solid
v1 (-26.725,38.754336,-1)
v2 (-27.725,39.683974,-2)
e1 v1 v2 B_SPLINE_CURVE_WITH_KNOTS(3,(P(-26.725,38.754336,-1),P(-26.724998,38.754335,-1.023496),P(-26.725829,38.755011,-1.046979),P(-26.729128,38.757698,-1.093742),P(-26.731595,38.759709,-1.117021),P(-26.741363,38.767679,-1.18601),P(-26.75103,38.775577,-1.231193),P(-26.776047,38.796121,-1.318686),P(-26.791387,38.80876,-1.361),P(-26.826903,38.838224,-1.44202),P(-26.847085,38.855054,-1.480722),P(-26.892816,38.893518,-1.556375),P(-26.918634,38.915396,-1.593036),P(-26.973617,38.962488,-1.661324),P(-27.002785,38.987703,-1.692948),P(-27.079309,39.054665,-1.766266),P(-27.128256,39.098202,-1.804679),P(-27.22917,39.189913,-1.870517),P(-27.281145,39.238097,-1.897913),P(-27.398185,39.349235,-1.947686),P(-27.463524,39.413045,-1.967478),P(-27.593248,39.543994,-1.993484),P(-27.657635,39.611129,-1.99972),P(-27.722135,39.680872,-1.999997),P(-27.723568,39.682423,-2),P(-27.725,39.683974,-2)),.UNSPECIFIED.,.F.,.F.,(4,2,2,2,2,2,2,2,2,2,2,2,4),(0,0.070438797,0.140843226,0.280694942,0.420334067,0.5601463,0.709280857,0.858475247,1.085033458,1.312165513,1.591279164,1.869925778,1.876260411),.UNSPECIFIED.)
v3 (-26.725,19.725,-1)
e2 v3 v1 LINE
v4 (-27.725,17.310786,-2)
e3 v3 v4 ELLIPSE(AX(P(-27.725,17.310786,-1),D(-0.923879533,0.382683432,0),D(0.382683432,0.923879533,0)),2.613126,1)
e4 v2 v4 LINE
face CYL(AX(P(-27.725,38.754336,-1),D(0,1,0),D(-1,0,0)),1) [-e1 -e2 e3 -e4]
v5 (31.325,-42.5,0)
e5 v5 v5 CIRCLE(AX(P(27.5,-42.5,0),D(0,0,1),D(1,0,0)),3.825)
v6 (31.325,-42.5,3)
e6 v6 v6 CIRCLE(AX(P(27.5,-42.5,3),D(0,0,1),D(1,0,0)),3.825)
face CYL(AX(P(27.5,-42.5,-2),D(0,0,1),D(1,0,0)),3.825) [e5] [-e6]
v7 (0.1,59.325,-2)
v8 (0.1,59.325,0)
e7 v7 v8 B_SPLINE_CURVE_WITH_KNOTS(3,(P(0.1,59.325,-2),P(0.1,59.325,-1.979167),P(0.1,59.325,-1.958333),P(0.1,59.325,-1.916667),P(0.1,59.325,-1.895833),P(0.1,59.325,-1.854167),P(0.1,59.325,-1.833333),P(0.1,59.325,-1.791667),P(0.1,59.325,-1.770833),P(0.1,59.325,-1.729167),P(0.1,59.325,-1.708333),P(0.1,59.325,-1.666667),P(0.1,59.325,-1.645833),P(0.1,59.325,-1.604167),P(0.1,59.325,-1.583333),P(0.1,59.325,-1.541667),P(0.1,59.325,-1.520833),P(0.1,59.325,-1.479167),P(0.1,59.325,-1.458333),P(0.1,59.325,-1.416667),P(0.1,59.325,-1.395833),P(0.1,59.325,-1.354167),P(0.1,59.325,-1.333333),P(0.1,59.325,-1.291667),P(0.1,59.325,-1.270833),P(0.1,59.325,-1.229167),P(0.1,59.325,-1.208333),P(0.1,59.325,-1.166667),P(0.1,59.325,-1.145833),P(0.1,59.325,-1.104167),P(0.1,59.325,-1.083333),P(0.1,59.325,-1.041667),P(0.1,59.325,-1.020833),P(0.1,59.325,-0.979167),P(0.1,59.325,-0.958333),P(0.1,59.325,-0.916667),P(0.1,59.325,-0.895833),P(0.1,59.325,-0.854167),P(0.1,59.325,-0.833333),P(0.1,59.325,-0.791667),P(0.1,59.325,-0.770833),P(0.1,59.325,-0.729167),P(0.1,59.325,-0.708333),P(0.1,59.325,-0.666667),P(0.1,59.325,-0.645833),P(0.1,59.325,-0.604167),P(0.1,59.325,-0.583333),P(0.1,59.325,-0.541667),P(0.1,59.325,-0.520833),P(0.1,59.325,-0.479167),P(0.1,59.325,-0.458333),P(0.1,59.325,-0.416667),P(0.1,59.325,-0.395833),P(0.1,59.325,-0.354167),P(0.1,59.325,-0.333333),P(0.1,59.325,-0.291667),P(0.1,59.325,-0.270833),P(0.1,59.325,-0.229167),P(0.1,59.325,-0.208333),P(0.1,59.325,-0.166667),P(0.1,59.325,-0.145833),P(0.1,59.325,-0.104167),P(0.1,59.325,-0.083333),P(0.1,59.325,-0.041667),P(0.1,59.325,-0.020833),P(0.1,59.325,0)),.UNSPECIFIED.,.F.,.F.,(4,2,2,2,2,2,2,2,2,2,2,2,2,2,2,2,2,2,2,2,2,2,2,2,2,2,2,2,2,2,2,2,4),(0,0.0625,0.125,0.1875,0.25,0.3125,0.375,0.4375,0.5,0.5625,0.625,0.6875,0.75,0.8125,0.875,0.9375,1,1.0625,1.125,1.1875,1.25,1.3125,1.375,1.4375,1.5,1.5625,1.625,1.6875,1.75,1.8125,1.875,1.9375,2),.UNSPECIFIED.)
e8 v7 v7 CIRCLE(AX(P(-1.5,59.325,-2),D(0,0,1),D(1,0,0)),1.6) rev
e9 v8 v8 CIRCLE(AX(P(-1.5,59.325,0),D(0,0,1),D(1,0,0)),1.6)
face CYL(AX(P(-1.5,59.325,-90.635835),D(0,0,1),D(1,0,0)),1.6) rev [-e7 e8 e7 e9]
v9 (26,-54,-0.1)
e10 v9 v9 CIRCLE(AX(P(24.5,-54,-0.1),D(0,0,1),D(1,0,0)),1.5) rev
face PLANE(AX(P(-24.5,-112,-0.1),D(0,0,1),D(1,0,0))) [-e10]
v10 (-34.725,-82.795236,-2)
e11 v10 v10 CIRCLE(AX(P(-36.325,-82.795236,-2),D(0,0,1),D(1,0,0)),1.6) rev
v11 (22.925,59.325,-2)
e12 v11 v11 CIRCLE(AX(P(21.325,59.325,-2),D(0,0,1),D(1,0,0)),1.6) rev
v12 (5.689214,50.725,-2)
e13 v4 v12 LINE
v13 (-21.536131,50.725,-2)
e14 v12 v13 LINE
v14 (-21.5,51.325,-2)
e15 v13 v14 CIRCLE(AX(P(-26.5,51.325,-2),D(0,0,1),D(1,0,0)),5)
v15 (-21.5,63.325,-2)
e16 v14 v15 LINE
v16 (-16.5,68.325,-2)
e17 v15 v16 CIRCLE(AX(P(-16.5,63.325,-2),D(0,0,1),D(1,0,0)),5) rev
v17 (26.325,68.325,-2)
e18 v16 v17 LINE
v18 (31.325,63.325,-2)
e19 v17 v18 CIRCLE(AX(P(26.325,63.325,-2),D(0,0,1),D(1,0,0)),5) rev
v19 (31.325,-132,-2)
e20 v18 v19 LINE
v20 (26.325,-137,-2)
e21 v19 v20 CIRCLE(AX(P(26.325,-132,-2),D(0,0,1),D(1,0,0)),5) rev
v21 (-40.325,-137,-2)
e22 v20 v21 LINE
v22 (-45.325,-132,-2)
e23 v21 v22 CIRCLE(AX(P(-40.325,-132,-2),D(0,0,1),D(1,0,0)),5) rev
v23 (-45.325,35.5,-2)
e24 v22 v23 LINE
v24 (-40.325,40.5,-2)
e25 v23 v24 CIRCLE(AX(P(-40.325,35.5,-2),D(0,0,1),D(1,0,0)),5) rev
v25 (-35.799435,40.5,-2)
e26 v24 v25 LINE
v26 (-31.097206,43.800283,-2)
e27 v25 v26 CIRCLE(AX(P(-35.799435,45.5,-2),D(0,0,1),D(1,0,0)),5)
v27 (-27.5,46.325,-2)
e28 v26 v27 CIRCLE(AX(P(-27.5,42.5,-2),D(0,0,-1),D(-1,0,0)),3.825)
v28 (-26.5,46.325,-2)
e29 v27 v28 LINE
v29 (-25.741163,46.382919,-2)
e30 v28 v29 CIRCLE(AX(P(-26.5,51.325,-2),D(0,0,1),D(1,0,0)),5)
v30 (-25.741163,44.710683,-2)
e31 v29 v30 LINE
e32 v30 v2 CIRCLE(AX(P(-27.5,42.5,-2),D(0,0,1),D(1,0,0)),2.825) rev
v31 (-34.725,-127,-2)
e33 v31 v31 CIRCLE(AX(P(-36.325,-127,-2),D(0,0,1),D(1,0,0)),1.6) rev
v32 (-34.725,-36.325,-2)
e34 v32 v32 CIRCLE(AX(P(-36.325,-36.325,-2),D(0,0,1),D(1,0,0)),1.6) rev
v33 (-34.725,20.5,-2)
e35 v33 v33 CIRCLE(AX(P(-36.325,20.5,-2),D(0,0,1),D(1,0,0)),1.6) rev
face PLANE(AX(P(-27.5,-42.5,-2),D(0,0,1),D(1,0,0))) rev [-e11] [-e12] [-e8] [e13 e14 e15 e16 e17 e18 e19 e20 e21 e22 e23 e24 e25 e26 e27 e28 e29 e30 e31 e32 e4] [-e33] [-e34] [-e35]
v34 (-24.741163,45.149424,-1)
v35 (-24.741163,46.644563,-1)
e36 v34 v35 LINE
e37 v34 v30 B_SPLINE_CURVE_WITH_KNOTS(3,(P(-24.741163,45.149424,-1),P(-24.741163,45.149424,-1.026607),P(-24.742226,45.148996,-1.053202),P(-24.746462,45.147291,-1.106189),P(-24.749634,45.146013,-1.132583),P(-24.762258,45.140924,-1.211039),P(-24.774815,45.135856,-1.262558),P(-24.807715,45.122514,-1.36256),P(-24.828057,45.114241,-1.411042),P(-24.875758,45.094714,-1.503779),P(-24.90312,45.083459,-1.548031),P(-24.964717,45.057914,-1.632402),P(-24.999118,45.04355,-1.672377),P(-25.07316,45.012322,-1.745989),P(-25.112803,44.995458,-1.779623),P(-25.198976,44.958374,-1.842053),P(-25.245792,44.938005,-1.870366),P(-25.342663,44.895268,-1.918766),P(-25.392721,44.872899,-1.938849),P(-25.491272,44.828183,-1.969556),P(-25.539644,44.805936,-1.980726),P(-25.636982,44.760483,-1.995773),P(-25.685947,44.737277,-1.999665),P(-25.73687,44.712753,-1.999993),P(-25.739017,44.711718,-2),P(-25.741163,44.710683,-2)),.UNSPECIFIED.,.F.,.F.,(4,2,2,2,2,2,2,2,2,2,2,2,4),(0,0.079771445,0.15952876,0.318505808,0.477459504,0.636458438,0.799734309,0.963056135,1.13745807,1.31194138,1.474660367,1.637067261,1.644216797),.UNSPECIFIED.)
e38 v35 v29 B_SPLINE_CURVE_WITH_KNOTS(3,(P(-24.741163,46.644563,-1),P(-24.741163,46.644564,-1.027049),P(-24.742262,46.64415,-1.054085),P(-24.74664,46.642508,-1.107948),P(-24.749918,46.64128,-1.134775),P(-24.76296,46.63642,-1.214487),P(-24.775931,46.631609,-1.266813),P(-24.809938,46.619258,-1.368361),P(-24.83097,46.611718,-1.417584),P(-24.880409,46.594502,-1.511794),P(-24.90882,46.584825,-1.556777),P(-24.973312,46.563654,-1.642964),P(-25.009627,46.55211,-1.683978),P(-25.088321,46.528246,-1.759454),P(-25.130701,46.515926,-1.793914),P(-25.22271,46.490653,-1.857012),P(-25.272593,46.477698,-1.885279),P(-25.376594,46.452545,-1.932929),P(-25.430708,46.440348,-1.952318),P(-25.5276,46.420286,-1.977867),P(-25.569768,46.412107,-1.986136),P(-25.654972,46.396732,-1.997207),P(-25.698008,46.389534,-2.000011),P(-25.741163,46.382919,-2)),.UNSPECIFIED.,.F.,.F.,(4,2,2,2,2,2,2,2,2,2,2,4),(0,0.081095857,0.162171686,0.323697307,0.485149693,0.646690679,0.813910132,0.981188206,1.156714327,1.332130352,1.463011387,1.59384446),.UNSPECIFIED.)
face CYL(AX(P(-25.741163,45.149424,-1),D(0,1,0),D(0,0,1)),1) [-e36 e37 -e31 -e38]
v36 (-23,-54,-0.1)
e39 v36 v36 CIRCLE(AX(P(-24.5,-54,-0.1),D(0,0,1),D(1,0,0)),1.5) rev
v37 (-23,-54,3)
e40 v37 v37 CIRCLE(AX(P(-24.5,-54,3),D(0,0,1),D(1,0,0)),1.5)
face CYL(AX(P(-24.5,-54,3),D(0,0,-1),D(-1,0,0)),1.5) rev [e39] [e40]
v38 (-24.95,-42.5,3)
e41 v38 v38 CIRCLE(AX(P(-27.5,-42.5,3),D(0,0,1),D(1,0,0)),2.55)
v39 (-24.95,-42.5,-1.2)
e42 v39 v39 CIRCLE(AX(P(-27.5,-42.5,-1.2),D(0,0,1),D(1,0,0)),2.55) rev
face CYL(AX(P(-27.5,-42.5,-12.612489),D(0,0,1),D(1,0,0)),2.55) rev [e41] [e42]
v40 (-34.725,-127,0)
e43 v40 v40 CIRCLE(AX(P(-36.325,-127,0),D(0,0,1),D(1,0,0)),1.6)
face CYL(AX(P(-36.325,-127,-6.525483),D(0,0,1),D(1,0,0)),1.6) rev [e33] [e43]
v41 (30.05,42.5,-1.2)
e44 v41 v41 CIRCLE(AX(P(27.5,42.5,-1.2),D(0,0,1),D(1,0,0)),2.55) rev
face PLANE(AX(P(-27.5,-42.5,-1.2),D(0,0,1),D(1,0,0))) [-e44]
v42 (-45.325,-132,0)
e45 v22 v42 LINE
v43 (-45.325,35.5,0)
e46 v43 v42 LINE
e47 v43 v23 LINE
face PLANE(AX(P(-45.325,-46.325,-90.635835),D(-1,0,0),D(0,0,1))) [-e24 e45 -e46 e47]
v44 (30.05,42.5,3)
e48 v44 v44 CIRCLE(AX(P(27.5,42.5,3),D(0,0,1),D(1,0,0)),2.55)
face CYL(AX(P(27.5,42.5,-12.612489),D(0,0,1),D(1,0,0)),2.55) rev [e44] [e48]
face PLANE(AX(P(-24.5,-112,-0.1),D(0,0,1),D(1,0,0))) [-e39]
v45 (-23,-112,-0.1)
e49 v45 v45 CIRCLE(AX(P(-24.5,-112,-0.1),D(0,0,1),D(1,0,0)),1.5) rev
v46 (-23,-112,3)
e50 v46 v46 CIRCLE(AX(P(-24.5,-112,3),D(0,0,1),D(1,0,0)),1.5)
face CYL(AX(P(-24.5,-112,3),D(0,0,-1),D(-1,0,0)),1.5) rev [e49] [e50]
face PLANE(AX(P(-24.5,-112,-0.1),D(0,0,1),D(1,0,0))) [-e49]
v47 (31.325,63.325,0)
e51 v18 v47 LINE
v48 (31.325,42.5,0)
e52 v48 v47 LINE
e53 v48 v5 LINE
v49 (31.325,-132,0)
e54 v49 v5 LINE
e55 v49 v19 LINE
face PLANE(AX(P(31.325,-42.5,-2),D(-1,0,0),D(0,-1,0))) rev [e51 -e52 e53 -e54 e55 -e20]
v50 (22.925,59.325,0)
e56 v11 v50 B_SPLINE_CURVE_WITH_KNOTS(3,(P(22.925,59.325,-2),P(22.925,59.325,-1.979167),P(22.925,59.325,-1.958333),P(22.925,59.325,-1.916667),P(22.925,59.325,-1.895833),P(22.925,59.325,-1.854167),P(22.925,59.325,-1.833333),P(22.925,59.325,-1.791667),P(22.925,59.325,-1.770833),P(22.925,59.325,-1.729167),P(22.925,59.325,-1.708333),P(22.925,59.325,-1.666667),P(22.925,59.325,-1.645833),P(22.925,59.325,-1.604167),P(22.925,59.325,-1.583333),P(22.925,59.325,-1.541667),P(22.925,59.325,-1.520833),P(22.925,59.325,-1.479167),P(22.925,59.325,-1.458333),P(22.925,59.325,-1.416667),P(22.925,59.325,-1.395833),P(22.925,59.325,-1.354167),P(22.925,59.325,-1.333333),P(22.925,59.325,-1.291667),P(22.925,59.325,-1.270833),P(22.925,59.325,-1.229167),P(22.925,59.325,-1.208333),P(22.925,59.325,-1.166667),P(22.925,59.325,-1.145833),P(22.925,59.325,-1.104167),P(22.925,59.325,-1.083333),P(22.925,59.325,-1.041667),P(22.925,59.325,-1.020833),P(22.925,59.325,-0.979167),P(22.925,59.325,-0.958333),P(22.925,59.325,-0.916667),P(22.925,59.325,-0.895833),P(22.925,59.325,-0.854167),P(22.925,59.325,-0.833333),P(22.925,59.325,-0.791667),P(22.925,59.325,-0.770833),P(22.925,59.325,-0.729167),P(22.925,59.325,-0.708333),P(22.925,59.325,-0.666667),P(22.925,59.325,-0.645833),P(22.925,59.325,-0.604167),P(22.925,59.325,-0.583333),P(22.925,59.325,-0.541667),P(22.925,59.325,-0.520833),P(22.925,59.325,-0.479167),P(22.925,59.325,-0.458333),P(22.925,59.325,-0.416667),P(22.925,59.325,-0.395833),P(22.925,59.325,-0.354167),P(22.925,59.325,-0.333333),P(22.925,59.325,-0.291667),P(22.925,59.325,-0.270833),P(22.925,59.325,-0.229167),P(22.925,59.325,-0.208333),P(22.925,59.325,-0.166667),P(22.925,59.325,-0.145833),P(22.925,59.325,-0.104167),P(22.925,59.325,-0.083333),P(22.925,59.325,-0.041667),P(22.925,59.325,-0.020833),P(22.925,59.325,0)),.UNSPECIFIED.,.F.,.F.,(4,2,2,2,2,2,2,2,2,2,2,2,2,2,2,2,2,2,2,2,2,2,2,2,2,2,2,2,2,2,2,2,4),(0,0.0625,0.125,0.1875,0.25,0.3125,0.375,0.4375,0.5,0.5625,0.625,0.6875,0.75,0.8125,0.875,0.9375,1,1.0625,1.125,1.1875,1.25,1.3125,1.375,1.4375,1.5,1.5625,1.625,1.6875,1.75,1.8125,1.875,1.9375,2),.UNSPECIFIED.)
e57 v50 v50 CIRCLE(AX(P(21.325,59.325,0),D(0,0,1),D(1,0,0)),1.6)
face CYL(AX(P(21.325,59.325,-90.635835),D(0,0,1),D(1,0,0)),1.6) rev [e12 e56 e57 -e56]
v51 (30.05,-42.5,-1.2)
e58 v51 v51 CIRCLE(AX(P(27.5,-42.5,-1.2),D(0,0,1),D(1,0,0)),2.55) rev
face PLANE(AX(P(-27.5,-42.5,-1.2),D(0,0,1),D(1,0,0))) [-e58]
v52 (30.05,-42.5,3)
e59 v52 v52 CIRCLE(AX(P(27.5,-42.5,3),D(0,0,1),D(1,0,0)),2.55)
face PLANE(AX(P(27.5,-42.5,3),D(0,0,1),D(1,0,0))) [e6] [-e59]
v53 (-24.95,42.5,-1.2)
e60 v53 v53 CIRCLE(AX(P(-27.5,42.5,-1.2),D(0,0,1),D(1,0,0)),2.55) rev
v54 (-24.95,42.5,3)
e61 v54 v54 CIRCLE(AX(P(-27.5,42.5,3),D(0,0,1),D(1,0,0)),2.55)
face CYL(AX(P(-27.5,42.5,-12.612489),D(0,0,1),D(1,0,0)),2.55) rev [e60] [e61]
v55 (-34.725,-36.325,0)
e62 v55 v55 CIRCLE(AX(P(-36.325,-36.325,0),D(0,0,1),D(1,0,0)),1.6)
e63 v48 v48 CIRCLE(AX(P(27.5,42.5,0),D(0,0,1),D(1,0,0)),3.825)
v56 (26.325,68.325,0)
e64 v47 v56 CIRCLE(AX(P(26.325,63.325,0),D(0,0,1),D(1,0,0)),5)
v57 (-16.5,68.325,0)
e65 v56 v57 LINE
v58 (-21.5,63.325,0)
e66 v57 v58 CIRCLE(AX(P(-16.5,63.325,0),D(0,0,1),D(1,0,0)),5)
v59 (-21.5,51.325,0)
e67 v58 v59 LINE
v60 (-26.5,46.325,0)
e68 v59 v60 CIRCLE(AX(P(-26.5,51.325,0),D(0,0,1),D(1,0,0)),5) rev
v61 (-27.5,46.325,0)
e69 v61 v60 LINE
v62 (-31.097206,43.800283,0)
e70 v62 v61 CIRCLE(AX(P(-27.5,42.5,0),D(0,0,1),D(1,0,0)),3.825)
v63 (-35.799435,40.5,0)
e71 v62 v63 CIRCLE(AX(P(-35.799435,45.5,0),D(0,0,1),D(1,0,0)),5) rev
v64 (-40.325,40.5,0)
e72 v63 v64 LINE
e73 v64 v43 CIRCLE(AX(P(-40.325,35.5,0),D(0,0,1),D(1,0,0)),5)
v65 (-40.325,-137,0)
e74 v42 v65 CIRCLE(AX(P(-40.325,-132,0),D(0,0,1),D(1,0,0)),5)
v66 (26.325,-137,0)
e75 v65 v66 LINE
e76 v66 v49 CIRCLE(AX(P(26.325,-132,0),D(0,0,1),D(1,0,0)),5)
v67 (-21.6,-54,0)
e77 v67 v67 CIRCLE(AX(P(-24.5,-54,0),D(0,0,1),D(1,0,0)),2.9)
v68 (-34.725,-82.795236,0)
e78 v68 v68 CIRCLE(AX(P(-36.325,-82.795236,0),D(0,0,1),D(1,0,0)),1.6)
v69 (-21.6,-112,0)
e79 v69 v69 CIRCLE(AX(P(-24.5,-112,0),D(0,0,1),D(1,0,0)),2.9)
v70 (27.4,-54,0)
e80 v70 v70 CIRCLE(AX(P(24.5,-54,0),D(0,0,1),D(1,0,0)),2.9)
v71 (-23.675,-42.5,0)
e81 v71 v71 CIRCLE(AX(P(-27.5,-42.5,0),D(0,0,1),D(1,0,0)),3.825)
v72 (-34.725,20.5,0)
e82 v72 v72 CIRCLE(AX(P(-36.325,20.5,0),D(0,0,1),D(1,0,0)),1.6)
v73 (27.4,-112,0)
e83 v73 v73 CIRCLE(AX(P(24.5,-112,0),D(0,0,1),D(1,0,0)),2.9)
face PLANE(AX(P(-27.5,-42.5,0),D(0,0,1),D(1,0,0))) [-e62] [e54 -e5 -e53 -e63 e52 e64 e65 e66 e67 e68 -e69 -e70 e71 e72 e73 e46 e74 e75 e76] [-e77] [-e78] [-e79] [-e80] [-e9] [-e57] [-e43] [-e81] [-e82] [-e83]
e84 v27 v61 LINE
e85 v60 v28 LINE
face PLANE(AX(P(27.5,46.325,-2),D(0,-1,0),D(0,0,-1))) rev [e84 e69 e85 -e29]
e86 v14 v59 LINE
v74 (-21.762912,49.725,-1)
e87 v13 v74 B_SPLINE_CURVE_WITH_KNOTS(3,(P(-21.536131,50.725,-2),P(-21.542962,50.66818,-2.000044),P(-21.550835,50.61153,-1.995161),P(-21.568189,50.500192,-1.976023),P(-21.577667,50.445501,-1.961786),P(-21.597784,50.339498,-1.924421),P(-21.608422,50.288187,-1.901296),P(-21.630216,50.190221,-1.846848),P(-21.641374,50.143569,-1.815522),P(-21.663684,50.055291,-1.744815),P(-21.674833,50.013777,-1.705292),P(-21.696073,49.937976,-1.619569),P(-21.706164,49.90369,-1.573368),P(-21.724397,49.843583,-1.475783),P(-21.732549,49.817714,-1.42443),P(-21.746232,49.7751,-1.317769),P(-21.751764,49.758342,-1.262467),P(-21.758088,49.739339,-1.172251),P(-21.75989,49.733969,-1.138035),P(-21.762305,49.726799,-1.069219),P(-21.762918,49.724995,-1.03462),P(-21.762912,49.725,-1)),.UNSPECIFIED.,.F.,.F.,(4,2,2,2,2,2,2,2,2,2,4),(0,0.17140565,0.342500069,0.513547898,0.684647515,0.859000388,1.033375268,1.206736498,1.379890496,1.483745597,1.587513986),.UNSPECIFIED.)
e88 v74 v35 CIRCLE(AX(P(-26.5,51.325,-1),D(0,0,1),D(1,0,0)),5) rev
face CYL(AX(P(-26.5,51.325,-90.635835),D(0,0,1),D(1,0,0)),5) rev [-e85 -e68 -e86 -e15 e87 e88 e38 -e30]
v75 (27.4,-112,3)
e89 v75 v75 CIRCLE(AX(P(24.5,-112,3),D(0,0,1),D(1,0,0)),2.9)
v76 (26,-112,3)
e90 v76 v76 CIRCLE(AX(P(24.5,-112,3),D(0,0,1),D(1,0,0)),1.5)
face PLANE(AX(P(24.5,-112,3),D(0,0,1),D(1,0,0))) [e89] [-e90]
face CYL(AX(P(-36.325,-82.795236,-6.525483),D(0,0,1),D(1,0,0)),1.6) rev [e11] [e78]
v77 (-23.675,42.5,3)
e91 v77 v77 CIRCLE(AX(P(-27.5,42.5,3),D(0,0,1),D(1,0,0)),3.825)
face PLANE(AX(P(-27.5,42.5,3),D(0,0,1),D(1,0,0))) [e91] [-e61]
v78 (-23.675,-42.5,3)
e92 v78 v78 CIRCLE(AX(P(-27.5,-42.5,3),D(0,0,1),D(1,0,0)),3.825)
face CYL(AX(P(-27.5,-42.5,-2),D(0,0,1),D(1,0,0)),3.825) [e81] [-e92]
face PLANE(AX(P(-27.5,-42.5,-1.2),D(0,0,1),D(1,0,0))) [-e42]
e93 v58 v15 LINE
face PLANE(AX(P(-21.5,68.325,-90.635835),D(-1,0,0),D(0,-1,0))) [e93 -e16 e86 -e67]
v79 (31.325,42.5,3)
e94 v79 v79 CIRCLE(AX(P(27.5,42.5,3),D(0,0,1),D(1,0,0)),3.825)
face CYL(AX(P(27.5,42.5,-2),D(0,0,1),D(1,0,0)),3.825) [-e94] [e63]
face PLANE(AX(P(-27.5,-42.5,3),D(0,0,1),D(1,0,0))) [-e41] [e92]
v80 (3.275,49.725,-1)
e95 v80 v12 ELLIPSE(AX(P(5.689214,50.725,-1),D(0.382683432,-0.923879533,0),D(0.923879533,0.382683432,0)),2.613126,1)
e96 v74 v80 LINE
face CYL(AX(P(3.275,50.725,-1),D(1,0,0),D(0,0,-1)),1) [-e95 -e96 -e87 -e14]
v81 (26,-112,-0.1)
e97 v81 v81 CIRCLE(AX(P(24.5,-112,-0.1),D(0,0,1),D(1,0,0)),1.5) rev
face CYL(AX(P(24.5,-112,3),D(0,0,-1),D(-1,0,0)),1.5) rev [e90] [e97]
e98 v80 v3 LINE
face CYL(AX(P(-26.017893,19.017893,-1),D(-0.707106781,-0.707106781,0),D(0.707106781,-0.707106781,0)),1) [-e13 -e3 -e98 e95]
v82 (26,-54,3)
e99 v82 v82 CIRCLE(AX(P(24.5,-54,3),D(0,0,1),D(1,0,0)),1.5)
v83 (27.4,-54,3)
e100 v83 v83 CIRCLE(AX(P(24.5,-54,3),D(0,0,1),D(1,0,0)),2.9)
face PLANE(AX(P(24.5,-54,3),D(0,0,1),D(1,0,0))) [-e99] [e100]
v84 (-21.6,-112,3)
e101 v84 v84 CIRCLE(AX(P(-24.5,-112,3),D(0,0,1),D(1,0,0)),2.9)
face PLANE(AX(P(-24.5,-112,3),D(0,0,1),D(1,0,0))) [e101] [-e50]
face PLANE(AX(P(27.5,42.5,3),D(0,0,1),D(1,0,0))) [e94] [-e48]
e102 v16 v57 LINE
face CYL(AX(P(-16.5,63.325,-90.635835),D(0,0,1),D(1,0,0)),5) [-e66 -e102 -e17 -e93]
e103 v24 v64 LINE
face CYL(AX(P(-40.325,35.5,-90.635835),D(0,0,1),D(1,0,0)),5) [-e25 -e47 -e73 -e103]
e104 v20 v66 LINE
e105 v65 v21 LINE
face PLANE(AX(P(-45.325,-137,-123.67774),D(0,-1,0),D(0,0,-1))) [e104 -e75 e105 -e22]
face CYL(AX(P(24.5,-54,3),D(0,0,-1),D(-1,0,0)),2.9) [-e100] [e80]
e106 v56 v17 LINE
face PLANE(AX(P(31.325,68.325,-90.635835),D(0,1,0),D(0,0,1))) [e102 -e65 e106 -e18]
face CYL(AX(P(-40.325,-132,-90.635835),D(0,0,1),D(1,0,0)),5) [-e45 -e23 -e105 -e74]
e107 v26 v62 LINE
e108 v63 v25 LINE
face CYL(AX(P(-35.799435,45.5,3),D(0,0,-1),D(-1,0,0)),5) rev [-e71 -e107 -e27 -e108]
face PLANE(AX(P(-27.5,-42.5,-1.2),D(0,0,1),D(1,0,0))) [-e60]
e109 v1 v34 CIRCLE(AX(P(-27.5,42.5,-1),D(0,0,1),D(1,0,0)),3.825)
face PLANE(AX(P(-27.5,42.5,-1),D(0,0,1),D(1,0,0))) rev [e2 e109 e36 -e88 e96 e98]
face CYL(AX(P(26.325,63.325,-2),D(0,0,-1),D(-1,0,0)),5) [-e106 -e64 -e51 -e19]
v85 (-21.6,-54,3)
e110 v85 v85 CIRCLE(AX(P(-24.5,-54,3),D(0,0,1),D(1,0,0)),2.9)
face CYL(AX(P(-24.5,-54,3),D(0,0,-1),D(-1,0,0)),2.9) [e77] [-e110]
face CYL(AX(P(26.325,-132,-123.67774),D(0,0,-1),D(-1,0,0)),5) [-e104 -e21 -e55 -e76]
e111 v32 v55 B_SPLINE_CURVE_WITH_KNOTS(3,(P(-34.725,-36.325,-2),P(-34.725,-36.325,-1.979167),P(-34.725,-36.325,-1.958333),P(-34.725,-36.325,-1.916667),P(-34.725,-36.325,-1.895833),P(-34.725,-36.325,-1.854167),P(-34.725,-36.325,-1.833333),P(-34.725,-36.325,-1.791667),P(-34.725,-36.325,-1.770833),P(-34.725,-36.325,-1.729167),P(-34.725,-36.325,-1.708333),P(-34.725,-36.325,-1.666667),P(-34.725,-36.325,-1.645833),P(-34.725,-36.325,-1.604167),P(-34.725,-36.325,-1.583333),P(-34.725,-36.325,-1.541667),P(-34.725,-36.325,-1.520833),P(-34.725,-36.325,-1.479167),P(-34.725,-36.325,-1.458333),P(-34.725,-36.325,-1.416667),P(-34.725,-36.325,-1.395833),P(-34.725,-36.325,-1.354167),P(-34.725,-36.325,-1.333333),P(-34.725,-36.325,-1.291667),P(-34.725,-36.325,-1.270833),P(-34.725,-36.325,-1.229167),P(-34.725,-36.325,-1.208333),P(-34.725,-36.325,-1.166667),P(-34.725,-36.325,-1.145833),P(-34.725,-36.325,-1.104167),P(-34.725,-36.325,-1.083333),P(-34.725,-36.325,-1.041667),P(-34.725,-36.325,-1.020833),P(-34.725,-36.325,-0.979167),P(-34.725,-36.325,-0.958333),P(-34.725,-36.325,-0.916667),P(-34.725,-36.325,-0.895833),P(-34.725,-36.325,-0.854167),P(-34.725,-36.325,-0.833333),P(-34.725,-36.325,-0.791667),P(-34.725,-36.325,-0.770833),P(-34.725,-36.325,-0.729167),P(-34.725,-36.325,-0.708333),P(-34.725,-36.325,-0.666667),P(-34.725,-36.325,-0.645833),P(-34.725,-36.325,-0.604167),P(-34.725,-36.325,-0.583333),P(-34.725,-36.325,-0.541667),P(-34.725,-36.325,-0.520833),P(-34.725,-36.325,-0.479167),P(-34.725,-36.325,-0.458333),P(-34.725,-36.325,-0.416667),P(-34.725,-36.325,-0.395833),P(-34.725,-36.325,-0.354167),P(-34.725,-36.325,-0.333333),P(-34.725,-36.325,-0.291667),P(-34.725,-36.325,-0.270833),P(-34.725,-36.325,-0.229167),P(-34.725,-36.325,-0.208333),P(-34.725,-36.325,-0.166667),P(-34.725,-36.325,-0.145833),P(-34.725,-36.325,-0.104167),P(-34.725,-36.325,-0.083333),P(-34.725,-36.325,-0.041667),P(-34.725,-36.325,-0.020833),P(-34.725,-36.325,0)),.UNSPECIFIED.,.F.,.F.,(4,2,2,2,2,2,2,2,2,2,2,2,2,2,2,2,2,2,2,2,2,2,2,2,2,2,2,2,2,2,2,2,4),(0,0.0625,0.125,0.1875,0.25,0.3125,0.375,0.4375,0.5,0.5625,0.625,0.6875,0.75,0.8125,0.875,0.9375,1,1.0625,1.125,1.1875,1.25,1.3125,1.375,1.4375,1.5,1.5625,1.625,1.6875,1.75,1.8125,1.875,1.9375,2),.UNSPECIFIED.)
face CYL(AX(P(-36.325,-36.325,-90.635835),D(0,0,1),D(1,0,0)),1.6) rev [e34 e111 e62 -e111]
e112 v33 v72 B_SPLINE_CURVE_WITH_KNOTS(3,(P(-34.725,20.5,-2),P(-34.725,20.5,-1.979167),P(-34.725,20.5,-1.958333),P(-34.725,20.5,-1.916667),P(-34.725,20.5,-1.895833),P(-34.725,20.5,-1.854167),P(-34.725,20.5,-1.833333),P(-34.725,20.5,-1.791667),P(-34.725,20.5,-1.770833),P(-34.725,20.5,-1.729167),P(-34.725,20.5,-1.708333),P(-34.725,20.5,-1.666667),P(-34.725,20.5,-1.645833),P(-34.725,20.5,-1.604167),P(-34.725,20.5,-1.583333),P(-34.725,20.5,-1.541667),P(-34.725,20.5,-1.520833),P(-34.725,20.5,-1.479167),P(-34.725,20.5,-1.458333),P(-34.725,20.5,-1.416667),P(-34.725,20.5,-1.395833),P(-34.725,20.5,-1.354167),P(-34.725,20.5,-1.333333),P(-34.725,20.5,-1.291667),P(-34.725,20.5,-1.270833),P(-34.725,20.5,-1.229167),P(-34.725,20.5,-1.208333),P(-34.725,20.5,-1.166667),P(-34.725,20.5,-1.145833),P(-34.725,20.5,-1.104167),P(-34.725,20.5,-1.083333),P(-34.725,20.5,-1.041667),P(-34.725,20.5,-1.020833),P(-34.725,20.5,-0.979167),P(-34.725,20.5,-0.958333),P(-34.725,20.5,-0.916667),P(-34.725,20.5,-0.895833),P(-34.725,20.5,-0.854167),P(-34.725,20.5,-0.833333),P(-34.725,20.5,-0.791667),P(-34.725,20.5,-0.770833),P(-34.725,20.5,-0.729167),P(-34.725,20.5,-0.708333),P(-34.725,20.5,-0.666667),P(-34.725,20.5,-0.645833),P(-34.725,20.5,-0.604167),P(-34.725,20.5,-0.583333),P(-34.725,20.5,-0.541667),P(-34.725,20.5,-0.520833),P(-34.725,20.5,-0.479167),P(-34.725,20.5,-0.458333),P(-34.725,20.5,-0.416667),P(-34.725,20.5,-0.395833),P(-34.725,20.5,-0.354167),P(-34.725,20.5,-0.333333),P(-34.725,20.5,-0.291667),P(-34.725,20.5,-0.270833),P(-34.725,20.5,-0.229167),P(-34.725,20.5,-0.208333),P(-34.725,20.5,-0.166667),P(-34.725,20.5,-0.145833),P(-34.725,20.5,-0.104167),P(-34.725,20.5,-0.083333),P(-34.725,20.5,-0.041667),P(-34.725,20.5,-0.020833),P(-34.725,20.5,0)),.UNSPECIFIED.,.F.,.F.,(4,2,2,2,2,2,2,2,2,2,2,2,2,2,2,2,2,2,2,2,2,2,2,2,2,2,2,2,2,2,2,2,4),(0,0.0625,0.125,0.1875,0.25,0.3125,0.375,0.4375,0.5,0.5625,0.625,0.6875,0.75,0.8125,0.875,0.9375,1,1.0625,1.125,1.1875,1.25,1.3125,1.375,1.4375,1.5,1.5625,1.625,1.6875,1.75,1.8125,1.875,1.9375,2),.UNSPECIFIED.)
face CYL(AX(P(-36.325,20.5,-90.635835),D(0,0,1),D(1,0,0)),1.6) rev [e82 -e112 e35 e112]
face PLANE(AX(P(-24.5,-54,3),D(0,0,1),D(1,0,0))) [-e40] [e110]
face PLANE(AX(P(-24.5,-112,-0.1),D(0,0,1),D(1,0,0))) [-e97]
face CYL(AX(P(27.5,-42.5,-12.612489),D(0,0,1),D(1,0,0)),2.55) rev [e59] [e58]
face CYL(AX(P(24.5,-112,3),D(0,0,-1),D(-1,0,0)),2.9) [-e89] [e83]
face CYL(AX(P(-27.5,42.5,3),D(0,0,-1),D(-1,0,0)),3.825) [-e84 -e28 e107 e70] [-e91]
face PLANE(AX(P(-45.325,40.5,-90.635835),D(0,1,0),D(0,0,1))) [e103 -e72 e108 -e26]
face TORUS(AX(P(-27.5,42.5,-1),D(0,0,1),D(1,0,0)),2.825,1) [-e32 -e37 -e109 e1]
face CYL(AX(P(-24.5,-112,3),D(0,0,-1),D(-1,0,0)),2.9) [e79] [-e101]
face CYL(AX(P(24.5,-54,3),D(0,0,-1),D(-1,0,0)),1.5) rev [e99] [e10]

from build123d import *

# Parameters (mm, degrees)
SKETCH1_R             = 3.825
SKETCH1_R_2           = 2.525
BOSS_EXTRUDE1_DEPTH   = 3
BOSS_EXTRUDE1_2_DEPTH = 3
BOSS_EXTRUDE1_3_DEPTH = 3
BOSS_EXTRUDE1_4_DEPTH = 3
BOSS_EXTRUDE2_START   = 2
BOSS_EXTRUDE2_DEPTH   = 2
SKETCH4_R             = 1.6
BOSS_EXTRUDE3_DEPTH   = 2
SKETCH6_R             = 2.55
CUT_EXTRUDE1_DEPTH    = 4.2
BOSS_EXTRUDE4_START   = -2
BOSS_EXTRUDE4_DEPTH   = 2
SKETCH10_R            = 2.9
SKETCH10_R_2          = 1.5
BOSS_EXTRUDE5_DEPTH   = 3
CUT_EXTRUDE2_START    = -3.1
SKETCH11_R            = 1.5
CUT_EXTRUDE2_DEPTH    = 3.1
FILLET1_R             = 5
SKETCH12_R            = 1.6
CUT_EXTRUDE3_DEPTH    = 2
CUT_EXTRUDE4_DEPTH    = 1
FILLET2_R             = 1


# Some blends are built 0.0001 mm under size
with BuildPart() as part:
    # Sketch1 → Boss-Extrude1 (new body)
    with BuildSketch(Plane(origin=(0, 0, 0), x_dir=(0, 1, 0), z_dir=(0, 0, 1))):
        with Locations(Location((42.5, 27.5, 0), (0, 0, 270))):
            Circle(SKETCH1_R)
        with Locations(Location((42.5, 27.5, 0), (0, 0, 270))):
            Circle(SKETCH1_R_2, mode=Mode.SUBTRACT)
    extrude(amount=BOSS_EXTRUDE1_DEPTH)



with BuildPart() as body_2:
    # Sketch1 → Boss-Extrude1 2 (new body)
    with BuildSketch(Plane(origin=(0, 0, 0), x_dir=(0, 1, 0), z_dir=(0, 0, 1))):
        with Locations(Location((-42.5, 27.5, 0), (0, 0, 270))):
            Circle(SKETCH1_R)
        with Locations(Location((-42.5, 27.5, 0), (0, 0, 270))):
            Circle(SKETCH1_R_2, mode=Mode.SUBTRACT)
    extrude(amount=BOSS_EXTRUDE1_2_DEPTH)


with BuildPart() as body_3:
    # Sketch1 → Boss-Extrude1 3 (new body)
    with BuildSketch(Plane(origin=(0, 0, 0), x_dir=(0, 1, 0), z_dir=(0, 0, 1))):
        with Locations(Location((-42.5, -27.5, 0), (0, 0, 270))):
            Circle(SKETCH1_R)
        with Locations(Location((-42.5, -27.5, 0), (0, 0, 270))):
            Circle(SKETCH1_R_2, mode=Mode.SUBTRACT)
    extrude(amount=BOSS_EXTRUDE1_3_DEPTH)


with BuildPart() as body_4:
    # Sketch1 → Boss-Extrude1 4 (new body)
    with BuildSketch(Plane(origin=(0, 0, 0), x_dir=(0, 1, 0), z_dir=(0, 0, 1))):
        with Locations(Location((42.5, -27.5, 0), (0, 0, 270))):
            Circle(SKETCH1_R)
        with Locations(Location((42.5, -27.5, 0), (0, 0, 270))):
            Circle(SKETCH1_R_2, mode=Mode.SUBTRACT)
    extrude(amount=BOSS_EXTRUDE1_4_DEPTH)


with BuildPart() as part_1:
    add(part.part)

    add(body_2.part)  # Boss-Extrude2 merges body 2

    add(body_3.part)  # Boss-Extrude2 merges body 3

    add(body_4.part)  # Boss-Extrude2 merges body 4
    # Sketch3 → Boss-Extrude2 (add)
    with BuildSketch(Plane(origin=(0, 0, 0), x_dir=(1, 0, 0), z_dir=(0, 0, -1)).offset(BOSS_EXTRUDE2_START)):
        with BuildLine():
            Line((-31.325, -42.5), (-31.325, 42.5))
            ThreePointArc((-31.325, 42.5), (-30.204683438, 45.204683438), (-27.5, 46.325))
            Line((-27.5, 46.325), (27.5, 46.325))
            ThreePointArc((27.5, 46.325), (30.204683438, 45.204683438), (31.325, 42.5))
            Line((31.325, 42.5), (31.325, -42.5))
            ThreePointArc((31.325, -42.5), (30.204683438, -45.204683438), (27.5, -46.325))
            Line((27.5, -46.325), (-27.5, -46.325))
            ThreePointArc((-27.5, -46.325), (-30.204683438, -45.204683438), (-31.325, -42.5))
        make_face()
    extrude(amount=-BOSS_EXTRUDE2_DEPTH)

    # Sketch4 → Boss-Extrude3 (add)
    # profile 1 of 2: a face of its own
    with BuildSketch(Plane.XY):
        Polygon((-27.5, -46.325), (-45.325, -46.325), (-45.325, 40.5), (-31.325, 40.5), (-31.325, -42.5), align=None)
        with Locations((-36.325, 20.5)):
            Circle(SKETCH4_R, mode=Mode.SUBTRACT)
        with Locations((-36.325, -36.325)):
            Circle(SKETCH4_R, mode=Mode.SUBTRACT)
    # profile 2 of 2: a face of its own
    with BuildSketch(Plane.XY):
        Polygon((31.325, 42.5), (31.325, 68.325), (-21.5, 68.325), (-21.5, 46.325), (27.5, 46.325), align=None)
        with Locations((21.325, 59.325)):
            Circle(SKETCH4_R, mode=Mode.SUBTRACT)
        with Locations((-1.5, 59.325)):
            Circle(SKETCH4_R, mode=Mode.SUBTRACT)
    extrude(amount=-BOSS_EXTRUDE3_DEPTH)

    # Sketch6 → Cut-Extrude1 (cut)
    with BuildSketch(Plane.XY.offset(3)):
        with Locations((-27.5, 42.5)):
            Circle(SKETCH6_R)
        with Locations((27.5, 42.5)):
            Circle(SKETCH6_R)
        with Locations((27.5, -42.5)):
            Circle(SKETCH6_R)
        with Locations((-27.5, -42.5)):
            Circle(SKETCH6_R)
    extrude(amount=-CUT_EXTRUDE1_DEPTH, mode=Mode.SUBTRACT)

    # Sketch9 → Boss-Extrude4 (add)
    with BuildSketch(Plane.XY.offset(BOSS_EXTRUDE4_START)):
        with BuildLine():
            Line((-45.325, -46.325), (27.5, -46.325))
            ThreePointArc((27.5, -46.325), (30.204683438, -45.204683438), (31.325, -42.5))
            Line((31.325, -42.5), (31.325, -137))
            Line((31.325, -137), (-45.325, -137))
            Line((-45.325, -137), (-45.325, -46.325))
        make_face()
    extrude(amount=BOSS_EXTRUDE4_DEPTH)

    # Sketch10 → Boss-Extrude5 (add)
    # profile 1 of 4: a face of its own
    with BuildSketch(Plane.XY):
        with Locations((-24.5, -112)):
            Circle(SKETCH10_R)
        with Locations((-24.5, -112)):
            Circle(SKETCH10_R_2, mode=Mode.SUBTRACT)
    # profile 2 of 4: a face of its own
    with BuildSketch(Plane.XY):
        with Locations((-24.5, -54)):
            Circle(SKETCH10_R)
        with Locations((-24.5, -54)):
            Circle(SKETCH10_R_2, mode=Mode.SUBTRACT)
    # profile 3 of 4: a face of its own
    with BuildSketch(Plane.XY):
        with Locations((24.5, -54)):
            Circle(SKETCH10_R)
        with Locations((24.5, -54)):
            Circle(SKETCH10_R_2, mode=Mode.SUBTRACT)
    # profile 4 of 4: a face of its own
    with BuildSketch(Plane.XY):
        with Locations((24.5, -112)):
            Circle(SKETCH10_R)
        with Locations((24.5, -112)):
            Circle(SKETCH10_R_2, mode=Mode.SUBTRACT)
    extrude(amount=BOSS_EXTRUDE5_DEPTH)

    # Sketch11 → Cut-Extrude2 (cut)
    with BuildSketch(Plane.XY.offset(3).offset(CUT_EXTRUDE2_START)):
        with Locations((-24.5, -112)):
            Circle(SKETCH11_R)
        with Locations((24.5, -112)):
            Circle(SKETCH11_R)
        with Locations((24.5, -54)):
            Circle(SKETCH11_R)
        with Locations((-24.5, -54)):
            Circle(SKETCH11_R)
    extrude(amount=CUT_EXTRUDE2_DEPTH, mode=Mode.SUBTRACT)

    # Fillet1
    # the kernel refuses this fillet: 5 mm, written as the material it adds along each edge
    with BuildSketch(Plane(origin=(-21.5, 46.325, 0), x_dir=(-1, 0, 0), z_dir=(0, 0, -1))) as fillet1_piece_1:
        with BuildLine():
            CenterArc((FILLET1_R, FILLET1_R), FILLET1_R, 180, 90)
            Line((0, FILLET1_R), (0, 0))
            Line((0, 0), (FILLET1_R, 0))
        make_face()
    extrude(amount=2)
    with BuildSketch(Plane(origin=(-31.325, 40.5, 0), x_dir=(-1, 0, 0), z_dir=(0, 0, -1))) as fillet1_piece_2:
        with BuildLine():
            CenterArc((4.474435222, 5), FILLET1_R, 199.873422245, 70.126577755)
            Line((-0.227794366, 3.300283286), (-0.698017324, 3.130311615))
            ThreePointArc((-0.698017324, 3.130311615), (-0.5, 2), (-0.5, 0))
            Line((-0.5, 0), (0, -0.5))
            Line((0, -0.5), (4.474435222, -0.5))
            Line((4.474435222, -0.5), (4.474435222, 0))
        make_face()
    extrude(amount=2)
    # the kernel refuses this fillet: 5 mm, written as the material it takes off along each edge
    with BuildSketch(Plane(origin=(-45.325, 40.5, 12.5), x_dir=(0, -1, 0), z_dir=(0, 0, -1)), Plane(origin=(-21.5, 68.325, 12.5), x_dir=(0, -1, 0), z_dir=(0, 0, -1)), Plane(origin=(31.325, 68.325, 12.5), x_dir=(-1, 0, 0), z_dir=(0, 0, -1))) as fillet1_2_piece_1:
        with BuildLine():
            CenterArc((FILLET1_R, -FILLET1_R), FILLET1_R, 90, 90)
            Line((0, -FILLET1_R), (0, 0))
            Line((0, 0), (FILLET1_R, 0))
        make_face()
    extrude(amount=27, mode=Mode.SUBTRACT)
    with BuildSketch(Plane(origin=(-45.325, -137, -14.5), x_dir=(1, 0, 0), z_dir=(0, 0, 1)), Plane(origin=(31.325, -137, -14.5), x_dir=(0, 1, 0), z_dir=(0, 0, 1))) as fillet1_2_piece_2:
        with BuildLine():
            CenterArc((FILLET1_R, FILLET1_R), FILLET1_R, 180, 90)
            Line((0, FILLET1_R), (0, 0))
            Line((0, 0), (FILLET1_R, 0))
        make_face()
    extrude(amount=27, mode=Mode.SUBTRACT)

    # Sketch12 → Cut-Extrude3 (cut)
    with BuildSketch(Plane.XY):
        with Locations((-36.325, -127)):
            Circle(SKETCH12_R)
        with Locations((-36.325, -82.7952358)):
            Circle(SKETCH12_R)
    extrude(amount=-CUT_EXTRUDE3_DEPTH, mode=Mode.SUBTRACT)

    # Sketch14 → Cut-Extrude4 (cut)
    with BuildSketch(Plane.YX.offset(2)):
        with BuildLine():
            Line((19.725, -26.725), (49.725, 3.275))
            Line((49.725, 3.275), (49.725, -24.741163405))
            Line((49.725, -24.741163405), (45.149423643, -24.741163405))
            ThreePointArc((45.149423643, -24.741163405), (41.366713749, -23.846742923), (38.75433584, -26.725))
            Line((38.75433584, -26.725), (19.725, -26.725))
        make_face()
    extrude(amount=-CUT_EXTRUDE4_DEPTH, mode=Mode.SUBTRACT)

    # Fillet2
    fillet2_edges = [part_1.edges().sort_by_distance(p)[0] for p in [
        (-24.741163405, 45.896993144, -2),
        (-23.846742923, 41.366713749, -2),
        (-26.725, 29.23966792, -2),
        (-9.243956144, 49.725, -2),
        (-11.725, 34.725, -2),
    ]]
    fillet(fillet2_edges, radius=FILLET2_R - 0.0001)  # a hair under: the kernel refuses the full size


solid = part_1.part
